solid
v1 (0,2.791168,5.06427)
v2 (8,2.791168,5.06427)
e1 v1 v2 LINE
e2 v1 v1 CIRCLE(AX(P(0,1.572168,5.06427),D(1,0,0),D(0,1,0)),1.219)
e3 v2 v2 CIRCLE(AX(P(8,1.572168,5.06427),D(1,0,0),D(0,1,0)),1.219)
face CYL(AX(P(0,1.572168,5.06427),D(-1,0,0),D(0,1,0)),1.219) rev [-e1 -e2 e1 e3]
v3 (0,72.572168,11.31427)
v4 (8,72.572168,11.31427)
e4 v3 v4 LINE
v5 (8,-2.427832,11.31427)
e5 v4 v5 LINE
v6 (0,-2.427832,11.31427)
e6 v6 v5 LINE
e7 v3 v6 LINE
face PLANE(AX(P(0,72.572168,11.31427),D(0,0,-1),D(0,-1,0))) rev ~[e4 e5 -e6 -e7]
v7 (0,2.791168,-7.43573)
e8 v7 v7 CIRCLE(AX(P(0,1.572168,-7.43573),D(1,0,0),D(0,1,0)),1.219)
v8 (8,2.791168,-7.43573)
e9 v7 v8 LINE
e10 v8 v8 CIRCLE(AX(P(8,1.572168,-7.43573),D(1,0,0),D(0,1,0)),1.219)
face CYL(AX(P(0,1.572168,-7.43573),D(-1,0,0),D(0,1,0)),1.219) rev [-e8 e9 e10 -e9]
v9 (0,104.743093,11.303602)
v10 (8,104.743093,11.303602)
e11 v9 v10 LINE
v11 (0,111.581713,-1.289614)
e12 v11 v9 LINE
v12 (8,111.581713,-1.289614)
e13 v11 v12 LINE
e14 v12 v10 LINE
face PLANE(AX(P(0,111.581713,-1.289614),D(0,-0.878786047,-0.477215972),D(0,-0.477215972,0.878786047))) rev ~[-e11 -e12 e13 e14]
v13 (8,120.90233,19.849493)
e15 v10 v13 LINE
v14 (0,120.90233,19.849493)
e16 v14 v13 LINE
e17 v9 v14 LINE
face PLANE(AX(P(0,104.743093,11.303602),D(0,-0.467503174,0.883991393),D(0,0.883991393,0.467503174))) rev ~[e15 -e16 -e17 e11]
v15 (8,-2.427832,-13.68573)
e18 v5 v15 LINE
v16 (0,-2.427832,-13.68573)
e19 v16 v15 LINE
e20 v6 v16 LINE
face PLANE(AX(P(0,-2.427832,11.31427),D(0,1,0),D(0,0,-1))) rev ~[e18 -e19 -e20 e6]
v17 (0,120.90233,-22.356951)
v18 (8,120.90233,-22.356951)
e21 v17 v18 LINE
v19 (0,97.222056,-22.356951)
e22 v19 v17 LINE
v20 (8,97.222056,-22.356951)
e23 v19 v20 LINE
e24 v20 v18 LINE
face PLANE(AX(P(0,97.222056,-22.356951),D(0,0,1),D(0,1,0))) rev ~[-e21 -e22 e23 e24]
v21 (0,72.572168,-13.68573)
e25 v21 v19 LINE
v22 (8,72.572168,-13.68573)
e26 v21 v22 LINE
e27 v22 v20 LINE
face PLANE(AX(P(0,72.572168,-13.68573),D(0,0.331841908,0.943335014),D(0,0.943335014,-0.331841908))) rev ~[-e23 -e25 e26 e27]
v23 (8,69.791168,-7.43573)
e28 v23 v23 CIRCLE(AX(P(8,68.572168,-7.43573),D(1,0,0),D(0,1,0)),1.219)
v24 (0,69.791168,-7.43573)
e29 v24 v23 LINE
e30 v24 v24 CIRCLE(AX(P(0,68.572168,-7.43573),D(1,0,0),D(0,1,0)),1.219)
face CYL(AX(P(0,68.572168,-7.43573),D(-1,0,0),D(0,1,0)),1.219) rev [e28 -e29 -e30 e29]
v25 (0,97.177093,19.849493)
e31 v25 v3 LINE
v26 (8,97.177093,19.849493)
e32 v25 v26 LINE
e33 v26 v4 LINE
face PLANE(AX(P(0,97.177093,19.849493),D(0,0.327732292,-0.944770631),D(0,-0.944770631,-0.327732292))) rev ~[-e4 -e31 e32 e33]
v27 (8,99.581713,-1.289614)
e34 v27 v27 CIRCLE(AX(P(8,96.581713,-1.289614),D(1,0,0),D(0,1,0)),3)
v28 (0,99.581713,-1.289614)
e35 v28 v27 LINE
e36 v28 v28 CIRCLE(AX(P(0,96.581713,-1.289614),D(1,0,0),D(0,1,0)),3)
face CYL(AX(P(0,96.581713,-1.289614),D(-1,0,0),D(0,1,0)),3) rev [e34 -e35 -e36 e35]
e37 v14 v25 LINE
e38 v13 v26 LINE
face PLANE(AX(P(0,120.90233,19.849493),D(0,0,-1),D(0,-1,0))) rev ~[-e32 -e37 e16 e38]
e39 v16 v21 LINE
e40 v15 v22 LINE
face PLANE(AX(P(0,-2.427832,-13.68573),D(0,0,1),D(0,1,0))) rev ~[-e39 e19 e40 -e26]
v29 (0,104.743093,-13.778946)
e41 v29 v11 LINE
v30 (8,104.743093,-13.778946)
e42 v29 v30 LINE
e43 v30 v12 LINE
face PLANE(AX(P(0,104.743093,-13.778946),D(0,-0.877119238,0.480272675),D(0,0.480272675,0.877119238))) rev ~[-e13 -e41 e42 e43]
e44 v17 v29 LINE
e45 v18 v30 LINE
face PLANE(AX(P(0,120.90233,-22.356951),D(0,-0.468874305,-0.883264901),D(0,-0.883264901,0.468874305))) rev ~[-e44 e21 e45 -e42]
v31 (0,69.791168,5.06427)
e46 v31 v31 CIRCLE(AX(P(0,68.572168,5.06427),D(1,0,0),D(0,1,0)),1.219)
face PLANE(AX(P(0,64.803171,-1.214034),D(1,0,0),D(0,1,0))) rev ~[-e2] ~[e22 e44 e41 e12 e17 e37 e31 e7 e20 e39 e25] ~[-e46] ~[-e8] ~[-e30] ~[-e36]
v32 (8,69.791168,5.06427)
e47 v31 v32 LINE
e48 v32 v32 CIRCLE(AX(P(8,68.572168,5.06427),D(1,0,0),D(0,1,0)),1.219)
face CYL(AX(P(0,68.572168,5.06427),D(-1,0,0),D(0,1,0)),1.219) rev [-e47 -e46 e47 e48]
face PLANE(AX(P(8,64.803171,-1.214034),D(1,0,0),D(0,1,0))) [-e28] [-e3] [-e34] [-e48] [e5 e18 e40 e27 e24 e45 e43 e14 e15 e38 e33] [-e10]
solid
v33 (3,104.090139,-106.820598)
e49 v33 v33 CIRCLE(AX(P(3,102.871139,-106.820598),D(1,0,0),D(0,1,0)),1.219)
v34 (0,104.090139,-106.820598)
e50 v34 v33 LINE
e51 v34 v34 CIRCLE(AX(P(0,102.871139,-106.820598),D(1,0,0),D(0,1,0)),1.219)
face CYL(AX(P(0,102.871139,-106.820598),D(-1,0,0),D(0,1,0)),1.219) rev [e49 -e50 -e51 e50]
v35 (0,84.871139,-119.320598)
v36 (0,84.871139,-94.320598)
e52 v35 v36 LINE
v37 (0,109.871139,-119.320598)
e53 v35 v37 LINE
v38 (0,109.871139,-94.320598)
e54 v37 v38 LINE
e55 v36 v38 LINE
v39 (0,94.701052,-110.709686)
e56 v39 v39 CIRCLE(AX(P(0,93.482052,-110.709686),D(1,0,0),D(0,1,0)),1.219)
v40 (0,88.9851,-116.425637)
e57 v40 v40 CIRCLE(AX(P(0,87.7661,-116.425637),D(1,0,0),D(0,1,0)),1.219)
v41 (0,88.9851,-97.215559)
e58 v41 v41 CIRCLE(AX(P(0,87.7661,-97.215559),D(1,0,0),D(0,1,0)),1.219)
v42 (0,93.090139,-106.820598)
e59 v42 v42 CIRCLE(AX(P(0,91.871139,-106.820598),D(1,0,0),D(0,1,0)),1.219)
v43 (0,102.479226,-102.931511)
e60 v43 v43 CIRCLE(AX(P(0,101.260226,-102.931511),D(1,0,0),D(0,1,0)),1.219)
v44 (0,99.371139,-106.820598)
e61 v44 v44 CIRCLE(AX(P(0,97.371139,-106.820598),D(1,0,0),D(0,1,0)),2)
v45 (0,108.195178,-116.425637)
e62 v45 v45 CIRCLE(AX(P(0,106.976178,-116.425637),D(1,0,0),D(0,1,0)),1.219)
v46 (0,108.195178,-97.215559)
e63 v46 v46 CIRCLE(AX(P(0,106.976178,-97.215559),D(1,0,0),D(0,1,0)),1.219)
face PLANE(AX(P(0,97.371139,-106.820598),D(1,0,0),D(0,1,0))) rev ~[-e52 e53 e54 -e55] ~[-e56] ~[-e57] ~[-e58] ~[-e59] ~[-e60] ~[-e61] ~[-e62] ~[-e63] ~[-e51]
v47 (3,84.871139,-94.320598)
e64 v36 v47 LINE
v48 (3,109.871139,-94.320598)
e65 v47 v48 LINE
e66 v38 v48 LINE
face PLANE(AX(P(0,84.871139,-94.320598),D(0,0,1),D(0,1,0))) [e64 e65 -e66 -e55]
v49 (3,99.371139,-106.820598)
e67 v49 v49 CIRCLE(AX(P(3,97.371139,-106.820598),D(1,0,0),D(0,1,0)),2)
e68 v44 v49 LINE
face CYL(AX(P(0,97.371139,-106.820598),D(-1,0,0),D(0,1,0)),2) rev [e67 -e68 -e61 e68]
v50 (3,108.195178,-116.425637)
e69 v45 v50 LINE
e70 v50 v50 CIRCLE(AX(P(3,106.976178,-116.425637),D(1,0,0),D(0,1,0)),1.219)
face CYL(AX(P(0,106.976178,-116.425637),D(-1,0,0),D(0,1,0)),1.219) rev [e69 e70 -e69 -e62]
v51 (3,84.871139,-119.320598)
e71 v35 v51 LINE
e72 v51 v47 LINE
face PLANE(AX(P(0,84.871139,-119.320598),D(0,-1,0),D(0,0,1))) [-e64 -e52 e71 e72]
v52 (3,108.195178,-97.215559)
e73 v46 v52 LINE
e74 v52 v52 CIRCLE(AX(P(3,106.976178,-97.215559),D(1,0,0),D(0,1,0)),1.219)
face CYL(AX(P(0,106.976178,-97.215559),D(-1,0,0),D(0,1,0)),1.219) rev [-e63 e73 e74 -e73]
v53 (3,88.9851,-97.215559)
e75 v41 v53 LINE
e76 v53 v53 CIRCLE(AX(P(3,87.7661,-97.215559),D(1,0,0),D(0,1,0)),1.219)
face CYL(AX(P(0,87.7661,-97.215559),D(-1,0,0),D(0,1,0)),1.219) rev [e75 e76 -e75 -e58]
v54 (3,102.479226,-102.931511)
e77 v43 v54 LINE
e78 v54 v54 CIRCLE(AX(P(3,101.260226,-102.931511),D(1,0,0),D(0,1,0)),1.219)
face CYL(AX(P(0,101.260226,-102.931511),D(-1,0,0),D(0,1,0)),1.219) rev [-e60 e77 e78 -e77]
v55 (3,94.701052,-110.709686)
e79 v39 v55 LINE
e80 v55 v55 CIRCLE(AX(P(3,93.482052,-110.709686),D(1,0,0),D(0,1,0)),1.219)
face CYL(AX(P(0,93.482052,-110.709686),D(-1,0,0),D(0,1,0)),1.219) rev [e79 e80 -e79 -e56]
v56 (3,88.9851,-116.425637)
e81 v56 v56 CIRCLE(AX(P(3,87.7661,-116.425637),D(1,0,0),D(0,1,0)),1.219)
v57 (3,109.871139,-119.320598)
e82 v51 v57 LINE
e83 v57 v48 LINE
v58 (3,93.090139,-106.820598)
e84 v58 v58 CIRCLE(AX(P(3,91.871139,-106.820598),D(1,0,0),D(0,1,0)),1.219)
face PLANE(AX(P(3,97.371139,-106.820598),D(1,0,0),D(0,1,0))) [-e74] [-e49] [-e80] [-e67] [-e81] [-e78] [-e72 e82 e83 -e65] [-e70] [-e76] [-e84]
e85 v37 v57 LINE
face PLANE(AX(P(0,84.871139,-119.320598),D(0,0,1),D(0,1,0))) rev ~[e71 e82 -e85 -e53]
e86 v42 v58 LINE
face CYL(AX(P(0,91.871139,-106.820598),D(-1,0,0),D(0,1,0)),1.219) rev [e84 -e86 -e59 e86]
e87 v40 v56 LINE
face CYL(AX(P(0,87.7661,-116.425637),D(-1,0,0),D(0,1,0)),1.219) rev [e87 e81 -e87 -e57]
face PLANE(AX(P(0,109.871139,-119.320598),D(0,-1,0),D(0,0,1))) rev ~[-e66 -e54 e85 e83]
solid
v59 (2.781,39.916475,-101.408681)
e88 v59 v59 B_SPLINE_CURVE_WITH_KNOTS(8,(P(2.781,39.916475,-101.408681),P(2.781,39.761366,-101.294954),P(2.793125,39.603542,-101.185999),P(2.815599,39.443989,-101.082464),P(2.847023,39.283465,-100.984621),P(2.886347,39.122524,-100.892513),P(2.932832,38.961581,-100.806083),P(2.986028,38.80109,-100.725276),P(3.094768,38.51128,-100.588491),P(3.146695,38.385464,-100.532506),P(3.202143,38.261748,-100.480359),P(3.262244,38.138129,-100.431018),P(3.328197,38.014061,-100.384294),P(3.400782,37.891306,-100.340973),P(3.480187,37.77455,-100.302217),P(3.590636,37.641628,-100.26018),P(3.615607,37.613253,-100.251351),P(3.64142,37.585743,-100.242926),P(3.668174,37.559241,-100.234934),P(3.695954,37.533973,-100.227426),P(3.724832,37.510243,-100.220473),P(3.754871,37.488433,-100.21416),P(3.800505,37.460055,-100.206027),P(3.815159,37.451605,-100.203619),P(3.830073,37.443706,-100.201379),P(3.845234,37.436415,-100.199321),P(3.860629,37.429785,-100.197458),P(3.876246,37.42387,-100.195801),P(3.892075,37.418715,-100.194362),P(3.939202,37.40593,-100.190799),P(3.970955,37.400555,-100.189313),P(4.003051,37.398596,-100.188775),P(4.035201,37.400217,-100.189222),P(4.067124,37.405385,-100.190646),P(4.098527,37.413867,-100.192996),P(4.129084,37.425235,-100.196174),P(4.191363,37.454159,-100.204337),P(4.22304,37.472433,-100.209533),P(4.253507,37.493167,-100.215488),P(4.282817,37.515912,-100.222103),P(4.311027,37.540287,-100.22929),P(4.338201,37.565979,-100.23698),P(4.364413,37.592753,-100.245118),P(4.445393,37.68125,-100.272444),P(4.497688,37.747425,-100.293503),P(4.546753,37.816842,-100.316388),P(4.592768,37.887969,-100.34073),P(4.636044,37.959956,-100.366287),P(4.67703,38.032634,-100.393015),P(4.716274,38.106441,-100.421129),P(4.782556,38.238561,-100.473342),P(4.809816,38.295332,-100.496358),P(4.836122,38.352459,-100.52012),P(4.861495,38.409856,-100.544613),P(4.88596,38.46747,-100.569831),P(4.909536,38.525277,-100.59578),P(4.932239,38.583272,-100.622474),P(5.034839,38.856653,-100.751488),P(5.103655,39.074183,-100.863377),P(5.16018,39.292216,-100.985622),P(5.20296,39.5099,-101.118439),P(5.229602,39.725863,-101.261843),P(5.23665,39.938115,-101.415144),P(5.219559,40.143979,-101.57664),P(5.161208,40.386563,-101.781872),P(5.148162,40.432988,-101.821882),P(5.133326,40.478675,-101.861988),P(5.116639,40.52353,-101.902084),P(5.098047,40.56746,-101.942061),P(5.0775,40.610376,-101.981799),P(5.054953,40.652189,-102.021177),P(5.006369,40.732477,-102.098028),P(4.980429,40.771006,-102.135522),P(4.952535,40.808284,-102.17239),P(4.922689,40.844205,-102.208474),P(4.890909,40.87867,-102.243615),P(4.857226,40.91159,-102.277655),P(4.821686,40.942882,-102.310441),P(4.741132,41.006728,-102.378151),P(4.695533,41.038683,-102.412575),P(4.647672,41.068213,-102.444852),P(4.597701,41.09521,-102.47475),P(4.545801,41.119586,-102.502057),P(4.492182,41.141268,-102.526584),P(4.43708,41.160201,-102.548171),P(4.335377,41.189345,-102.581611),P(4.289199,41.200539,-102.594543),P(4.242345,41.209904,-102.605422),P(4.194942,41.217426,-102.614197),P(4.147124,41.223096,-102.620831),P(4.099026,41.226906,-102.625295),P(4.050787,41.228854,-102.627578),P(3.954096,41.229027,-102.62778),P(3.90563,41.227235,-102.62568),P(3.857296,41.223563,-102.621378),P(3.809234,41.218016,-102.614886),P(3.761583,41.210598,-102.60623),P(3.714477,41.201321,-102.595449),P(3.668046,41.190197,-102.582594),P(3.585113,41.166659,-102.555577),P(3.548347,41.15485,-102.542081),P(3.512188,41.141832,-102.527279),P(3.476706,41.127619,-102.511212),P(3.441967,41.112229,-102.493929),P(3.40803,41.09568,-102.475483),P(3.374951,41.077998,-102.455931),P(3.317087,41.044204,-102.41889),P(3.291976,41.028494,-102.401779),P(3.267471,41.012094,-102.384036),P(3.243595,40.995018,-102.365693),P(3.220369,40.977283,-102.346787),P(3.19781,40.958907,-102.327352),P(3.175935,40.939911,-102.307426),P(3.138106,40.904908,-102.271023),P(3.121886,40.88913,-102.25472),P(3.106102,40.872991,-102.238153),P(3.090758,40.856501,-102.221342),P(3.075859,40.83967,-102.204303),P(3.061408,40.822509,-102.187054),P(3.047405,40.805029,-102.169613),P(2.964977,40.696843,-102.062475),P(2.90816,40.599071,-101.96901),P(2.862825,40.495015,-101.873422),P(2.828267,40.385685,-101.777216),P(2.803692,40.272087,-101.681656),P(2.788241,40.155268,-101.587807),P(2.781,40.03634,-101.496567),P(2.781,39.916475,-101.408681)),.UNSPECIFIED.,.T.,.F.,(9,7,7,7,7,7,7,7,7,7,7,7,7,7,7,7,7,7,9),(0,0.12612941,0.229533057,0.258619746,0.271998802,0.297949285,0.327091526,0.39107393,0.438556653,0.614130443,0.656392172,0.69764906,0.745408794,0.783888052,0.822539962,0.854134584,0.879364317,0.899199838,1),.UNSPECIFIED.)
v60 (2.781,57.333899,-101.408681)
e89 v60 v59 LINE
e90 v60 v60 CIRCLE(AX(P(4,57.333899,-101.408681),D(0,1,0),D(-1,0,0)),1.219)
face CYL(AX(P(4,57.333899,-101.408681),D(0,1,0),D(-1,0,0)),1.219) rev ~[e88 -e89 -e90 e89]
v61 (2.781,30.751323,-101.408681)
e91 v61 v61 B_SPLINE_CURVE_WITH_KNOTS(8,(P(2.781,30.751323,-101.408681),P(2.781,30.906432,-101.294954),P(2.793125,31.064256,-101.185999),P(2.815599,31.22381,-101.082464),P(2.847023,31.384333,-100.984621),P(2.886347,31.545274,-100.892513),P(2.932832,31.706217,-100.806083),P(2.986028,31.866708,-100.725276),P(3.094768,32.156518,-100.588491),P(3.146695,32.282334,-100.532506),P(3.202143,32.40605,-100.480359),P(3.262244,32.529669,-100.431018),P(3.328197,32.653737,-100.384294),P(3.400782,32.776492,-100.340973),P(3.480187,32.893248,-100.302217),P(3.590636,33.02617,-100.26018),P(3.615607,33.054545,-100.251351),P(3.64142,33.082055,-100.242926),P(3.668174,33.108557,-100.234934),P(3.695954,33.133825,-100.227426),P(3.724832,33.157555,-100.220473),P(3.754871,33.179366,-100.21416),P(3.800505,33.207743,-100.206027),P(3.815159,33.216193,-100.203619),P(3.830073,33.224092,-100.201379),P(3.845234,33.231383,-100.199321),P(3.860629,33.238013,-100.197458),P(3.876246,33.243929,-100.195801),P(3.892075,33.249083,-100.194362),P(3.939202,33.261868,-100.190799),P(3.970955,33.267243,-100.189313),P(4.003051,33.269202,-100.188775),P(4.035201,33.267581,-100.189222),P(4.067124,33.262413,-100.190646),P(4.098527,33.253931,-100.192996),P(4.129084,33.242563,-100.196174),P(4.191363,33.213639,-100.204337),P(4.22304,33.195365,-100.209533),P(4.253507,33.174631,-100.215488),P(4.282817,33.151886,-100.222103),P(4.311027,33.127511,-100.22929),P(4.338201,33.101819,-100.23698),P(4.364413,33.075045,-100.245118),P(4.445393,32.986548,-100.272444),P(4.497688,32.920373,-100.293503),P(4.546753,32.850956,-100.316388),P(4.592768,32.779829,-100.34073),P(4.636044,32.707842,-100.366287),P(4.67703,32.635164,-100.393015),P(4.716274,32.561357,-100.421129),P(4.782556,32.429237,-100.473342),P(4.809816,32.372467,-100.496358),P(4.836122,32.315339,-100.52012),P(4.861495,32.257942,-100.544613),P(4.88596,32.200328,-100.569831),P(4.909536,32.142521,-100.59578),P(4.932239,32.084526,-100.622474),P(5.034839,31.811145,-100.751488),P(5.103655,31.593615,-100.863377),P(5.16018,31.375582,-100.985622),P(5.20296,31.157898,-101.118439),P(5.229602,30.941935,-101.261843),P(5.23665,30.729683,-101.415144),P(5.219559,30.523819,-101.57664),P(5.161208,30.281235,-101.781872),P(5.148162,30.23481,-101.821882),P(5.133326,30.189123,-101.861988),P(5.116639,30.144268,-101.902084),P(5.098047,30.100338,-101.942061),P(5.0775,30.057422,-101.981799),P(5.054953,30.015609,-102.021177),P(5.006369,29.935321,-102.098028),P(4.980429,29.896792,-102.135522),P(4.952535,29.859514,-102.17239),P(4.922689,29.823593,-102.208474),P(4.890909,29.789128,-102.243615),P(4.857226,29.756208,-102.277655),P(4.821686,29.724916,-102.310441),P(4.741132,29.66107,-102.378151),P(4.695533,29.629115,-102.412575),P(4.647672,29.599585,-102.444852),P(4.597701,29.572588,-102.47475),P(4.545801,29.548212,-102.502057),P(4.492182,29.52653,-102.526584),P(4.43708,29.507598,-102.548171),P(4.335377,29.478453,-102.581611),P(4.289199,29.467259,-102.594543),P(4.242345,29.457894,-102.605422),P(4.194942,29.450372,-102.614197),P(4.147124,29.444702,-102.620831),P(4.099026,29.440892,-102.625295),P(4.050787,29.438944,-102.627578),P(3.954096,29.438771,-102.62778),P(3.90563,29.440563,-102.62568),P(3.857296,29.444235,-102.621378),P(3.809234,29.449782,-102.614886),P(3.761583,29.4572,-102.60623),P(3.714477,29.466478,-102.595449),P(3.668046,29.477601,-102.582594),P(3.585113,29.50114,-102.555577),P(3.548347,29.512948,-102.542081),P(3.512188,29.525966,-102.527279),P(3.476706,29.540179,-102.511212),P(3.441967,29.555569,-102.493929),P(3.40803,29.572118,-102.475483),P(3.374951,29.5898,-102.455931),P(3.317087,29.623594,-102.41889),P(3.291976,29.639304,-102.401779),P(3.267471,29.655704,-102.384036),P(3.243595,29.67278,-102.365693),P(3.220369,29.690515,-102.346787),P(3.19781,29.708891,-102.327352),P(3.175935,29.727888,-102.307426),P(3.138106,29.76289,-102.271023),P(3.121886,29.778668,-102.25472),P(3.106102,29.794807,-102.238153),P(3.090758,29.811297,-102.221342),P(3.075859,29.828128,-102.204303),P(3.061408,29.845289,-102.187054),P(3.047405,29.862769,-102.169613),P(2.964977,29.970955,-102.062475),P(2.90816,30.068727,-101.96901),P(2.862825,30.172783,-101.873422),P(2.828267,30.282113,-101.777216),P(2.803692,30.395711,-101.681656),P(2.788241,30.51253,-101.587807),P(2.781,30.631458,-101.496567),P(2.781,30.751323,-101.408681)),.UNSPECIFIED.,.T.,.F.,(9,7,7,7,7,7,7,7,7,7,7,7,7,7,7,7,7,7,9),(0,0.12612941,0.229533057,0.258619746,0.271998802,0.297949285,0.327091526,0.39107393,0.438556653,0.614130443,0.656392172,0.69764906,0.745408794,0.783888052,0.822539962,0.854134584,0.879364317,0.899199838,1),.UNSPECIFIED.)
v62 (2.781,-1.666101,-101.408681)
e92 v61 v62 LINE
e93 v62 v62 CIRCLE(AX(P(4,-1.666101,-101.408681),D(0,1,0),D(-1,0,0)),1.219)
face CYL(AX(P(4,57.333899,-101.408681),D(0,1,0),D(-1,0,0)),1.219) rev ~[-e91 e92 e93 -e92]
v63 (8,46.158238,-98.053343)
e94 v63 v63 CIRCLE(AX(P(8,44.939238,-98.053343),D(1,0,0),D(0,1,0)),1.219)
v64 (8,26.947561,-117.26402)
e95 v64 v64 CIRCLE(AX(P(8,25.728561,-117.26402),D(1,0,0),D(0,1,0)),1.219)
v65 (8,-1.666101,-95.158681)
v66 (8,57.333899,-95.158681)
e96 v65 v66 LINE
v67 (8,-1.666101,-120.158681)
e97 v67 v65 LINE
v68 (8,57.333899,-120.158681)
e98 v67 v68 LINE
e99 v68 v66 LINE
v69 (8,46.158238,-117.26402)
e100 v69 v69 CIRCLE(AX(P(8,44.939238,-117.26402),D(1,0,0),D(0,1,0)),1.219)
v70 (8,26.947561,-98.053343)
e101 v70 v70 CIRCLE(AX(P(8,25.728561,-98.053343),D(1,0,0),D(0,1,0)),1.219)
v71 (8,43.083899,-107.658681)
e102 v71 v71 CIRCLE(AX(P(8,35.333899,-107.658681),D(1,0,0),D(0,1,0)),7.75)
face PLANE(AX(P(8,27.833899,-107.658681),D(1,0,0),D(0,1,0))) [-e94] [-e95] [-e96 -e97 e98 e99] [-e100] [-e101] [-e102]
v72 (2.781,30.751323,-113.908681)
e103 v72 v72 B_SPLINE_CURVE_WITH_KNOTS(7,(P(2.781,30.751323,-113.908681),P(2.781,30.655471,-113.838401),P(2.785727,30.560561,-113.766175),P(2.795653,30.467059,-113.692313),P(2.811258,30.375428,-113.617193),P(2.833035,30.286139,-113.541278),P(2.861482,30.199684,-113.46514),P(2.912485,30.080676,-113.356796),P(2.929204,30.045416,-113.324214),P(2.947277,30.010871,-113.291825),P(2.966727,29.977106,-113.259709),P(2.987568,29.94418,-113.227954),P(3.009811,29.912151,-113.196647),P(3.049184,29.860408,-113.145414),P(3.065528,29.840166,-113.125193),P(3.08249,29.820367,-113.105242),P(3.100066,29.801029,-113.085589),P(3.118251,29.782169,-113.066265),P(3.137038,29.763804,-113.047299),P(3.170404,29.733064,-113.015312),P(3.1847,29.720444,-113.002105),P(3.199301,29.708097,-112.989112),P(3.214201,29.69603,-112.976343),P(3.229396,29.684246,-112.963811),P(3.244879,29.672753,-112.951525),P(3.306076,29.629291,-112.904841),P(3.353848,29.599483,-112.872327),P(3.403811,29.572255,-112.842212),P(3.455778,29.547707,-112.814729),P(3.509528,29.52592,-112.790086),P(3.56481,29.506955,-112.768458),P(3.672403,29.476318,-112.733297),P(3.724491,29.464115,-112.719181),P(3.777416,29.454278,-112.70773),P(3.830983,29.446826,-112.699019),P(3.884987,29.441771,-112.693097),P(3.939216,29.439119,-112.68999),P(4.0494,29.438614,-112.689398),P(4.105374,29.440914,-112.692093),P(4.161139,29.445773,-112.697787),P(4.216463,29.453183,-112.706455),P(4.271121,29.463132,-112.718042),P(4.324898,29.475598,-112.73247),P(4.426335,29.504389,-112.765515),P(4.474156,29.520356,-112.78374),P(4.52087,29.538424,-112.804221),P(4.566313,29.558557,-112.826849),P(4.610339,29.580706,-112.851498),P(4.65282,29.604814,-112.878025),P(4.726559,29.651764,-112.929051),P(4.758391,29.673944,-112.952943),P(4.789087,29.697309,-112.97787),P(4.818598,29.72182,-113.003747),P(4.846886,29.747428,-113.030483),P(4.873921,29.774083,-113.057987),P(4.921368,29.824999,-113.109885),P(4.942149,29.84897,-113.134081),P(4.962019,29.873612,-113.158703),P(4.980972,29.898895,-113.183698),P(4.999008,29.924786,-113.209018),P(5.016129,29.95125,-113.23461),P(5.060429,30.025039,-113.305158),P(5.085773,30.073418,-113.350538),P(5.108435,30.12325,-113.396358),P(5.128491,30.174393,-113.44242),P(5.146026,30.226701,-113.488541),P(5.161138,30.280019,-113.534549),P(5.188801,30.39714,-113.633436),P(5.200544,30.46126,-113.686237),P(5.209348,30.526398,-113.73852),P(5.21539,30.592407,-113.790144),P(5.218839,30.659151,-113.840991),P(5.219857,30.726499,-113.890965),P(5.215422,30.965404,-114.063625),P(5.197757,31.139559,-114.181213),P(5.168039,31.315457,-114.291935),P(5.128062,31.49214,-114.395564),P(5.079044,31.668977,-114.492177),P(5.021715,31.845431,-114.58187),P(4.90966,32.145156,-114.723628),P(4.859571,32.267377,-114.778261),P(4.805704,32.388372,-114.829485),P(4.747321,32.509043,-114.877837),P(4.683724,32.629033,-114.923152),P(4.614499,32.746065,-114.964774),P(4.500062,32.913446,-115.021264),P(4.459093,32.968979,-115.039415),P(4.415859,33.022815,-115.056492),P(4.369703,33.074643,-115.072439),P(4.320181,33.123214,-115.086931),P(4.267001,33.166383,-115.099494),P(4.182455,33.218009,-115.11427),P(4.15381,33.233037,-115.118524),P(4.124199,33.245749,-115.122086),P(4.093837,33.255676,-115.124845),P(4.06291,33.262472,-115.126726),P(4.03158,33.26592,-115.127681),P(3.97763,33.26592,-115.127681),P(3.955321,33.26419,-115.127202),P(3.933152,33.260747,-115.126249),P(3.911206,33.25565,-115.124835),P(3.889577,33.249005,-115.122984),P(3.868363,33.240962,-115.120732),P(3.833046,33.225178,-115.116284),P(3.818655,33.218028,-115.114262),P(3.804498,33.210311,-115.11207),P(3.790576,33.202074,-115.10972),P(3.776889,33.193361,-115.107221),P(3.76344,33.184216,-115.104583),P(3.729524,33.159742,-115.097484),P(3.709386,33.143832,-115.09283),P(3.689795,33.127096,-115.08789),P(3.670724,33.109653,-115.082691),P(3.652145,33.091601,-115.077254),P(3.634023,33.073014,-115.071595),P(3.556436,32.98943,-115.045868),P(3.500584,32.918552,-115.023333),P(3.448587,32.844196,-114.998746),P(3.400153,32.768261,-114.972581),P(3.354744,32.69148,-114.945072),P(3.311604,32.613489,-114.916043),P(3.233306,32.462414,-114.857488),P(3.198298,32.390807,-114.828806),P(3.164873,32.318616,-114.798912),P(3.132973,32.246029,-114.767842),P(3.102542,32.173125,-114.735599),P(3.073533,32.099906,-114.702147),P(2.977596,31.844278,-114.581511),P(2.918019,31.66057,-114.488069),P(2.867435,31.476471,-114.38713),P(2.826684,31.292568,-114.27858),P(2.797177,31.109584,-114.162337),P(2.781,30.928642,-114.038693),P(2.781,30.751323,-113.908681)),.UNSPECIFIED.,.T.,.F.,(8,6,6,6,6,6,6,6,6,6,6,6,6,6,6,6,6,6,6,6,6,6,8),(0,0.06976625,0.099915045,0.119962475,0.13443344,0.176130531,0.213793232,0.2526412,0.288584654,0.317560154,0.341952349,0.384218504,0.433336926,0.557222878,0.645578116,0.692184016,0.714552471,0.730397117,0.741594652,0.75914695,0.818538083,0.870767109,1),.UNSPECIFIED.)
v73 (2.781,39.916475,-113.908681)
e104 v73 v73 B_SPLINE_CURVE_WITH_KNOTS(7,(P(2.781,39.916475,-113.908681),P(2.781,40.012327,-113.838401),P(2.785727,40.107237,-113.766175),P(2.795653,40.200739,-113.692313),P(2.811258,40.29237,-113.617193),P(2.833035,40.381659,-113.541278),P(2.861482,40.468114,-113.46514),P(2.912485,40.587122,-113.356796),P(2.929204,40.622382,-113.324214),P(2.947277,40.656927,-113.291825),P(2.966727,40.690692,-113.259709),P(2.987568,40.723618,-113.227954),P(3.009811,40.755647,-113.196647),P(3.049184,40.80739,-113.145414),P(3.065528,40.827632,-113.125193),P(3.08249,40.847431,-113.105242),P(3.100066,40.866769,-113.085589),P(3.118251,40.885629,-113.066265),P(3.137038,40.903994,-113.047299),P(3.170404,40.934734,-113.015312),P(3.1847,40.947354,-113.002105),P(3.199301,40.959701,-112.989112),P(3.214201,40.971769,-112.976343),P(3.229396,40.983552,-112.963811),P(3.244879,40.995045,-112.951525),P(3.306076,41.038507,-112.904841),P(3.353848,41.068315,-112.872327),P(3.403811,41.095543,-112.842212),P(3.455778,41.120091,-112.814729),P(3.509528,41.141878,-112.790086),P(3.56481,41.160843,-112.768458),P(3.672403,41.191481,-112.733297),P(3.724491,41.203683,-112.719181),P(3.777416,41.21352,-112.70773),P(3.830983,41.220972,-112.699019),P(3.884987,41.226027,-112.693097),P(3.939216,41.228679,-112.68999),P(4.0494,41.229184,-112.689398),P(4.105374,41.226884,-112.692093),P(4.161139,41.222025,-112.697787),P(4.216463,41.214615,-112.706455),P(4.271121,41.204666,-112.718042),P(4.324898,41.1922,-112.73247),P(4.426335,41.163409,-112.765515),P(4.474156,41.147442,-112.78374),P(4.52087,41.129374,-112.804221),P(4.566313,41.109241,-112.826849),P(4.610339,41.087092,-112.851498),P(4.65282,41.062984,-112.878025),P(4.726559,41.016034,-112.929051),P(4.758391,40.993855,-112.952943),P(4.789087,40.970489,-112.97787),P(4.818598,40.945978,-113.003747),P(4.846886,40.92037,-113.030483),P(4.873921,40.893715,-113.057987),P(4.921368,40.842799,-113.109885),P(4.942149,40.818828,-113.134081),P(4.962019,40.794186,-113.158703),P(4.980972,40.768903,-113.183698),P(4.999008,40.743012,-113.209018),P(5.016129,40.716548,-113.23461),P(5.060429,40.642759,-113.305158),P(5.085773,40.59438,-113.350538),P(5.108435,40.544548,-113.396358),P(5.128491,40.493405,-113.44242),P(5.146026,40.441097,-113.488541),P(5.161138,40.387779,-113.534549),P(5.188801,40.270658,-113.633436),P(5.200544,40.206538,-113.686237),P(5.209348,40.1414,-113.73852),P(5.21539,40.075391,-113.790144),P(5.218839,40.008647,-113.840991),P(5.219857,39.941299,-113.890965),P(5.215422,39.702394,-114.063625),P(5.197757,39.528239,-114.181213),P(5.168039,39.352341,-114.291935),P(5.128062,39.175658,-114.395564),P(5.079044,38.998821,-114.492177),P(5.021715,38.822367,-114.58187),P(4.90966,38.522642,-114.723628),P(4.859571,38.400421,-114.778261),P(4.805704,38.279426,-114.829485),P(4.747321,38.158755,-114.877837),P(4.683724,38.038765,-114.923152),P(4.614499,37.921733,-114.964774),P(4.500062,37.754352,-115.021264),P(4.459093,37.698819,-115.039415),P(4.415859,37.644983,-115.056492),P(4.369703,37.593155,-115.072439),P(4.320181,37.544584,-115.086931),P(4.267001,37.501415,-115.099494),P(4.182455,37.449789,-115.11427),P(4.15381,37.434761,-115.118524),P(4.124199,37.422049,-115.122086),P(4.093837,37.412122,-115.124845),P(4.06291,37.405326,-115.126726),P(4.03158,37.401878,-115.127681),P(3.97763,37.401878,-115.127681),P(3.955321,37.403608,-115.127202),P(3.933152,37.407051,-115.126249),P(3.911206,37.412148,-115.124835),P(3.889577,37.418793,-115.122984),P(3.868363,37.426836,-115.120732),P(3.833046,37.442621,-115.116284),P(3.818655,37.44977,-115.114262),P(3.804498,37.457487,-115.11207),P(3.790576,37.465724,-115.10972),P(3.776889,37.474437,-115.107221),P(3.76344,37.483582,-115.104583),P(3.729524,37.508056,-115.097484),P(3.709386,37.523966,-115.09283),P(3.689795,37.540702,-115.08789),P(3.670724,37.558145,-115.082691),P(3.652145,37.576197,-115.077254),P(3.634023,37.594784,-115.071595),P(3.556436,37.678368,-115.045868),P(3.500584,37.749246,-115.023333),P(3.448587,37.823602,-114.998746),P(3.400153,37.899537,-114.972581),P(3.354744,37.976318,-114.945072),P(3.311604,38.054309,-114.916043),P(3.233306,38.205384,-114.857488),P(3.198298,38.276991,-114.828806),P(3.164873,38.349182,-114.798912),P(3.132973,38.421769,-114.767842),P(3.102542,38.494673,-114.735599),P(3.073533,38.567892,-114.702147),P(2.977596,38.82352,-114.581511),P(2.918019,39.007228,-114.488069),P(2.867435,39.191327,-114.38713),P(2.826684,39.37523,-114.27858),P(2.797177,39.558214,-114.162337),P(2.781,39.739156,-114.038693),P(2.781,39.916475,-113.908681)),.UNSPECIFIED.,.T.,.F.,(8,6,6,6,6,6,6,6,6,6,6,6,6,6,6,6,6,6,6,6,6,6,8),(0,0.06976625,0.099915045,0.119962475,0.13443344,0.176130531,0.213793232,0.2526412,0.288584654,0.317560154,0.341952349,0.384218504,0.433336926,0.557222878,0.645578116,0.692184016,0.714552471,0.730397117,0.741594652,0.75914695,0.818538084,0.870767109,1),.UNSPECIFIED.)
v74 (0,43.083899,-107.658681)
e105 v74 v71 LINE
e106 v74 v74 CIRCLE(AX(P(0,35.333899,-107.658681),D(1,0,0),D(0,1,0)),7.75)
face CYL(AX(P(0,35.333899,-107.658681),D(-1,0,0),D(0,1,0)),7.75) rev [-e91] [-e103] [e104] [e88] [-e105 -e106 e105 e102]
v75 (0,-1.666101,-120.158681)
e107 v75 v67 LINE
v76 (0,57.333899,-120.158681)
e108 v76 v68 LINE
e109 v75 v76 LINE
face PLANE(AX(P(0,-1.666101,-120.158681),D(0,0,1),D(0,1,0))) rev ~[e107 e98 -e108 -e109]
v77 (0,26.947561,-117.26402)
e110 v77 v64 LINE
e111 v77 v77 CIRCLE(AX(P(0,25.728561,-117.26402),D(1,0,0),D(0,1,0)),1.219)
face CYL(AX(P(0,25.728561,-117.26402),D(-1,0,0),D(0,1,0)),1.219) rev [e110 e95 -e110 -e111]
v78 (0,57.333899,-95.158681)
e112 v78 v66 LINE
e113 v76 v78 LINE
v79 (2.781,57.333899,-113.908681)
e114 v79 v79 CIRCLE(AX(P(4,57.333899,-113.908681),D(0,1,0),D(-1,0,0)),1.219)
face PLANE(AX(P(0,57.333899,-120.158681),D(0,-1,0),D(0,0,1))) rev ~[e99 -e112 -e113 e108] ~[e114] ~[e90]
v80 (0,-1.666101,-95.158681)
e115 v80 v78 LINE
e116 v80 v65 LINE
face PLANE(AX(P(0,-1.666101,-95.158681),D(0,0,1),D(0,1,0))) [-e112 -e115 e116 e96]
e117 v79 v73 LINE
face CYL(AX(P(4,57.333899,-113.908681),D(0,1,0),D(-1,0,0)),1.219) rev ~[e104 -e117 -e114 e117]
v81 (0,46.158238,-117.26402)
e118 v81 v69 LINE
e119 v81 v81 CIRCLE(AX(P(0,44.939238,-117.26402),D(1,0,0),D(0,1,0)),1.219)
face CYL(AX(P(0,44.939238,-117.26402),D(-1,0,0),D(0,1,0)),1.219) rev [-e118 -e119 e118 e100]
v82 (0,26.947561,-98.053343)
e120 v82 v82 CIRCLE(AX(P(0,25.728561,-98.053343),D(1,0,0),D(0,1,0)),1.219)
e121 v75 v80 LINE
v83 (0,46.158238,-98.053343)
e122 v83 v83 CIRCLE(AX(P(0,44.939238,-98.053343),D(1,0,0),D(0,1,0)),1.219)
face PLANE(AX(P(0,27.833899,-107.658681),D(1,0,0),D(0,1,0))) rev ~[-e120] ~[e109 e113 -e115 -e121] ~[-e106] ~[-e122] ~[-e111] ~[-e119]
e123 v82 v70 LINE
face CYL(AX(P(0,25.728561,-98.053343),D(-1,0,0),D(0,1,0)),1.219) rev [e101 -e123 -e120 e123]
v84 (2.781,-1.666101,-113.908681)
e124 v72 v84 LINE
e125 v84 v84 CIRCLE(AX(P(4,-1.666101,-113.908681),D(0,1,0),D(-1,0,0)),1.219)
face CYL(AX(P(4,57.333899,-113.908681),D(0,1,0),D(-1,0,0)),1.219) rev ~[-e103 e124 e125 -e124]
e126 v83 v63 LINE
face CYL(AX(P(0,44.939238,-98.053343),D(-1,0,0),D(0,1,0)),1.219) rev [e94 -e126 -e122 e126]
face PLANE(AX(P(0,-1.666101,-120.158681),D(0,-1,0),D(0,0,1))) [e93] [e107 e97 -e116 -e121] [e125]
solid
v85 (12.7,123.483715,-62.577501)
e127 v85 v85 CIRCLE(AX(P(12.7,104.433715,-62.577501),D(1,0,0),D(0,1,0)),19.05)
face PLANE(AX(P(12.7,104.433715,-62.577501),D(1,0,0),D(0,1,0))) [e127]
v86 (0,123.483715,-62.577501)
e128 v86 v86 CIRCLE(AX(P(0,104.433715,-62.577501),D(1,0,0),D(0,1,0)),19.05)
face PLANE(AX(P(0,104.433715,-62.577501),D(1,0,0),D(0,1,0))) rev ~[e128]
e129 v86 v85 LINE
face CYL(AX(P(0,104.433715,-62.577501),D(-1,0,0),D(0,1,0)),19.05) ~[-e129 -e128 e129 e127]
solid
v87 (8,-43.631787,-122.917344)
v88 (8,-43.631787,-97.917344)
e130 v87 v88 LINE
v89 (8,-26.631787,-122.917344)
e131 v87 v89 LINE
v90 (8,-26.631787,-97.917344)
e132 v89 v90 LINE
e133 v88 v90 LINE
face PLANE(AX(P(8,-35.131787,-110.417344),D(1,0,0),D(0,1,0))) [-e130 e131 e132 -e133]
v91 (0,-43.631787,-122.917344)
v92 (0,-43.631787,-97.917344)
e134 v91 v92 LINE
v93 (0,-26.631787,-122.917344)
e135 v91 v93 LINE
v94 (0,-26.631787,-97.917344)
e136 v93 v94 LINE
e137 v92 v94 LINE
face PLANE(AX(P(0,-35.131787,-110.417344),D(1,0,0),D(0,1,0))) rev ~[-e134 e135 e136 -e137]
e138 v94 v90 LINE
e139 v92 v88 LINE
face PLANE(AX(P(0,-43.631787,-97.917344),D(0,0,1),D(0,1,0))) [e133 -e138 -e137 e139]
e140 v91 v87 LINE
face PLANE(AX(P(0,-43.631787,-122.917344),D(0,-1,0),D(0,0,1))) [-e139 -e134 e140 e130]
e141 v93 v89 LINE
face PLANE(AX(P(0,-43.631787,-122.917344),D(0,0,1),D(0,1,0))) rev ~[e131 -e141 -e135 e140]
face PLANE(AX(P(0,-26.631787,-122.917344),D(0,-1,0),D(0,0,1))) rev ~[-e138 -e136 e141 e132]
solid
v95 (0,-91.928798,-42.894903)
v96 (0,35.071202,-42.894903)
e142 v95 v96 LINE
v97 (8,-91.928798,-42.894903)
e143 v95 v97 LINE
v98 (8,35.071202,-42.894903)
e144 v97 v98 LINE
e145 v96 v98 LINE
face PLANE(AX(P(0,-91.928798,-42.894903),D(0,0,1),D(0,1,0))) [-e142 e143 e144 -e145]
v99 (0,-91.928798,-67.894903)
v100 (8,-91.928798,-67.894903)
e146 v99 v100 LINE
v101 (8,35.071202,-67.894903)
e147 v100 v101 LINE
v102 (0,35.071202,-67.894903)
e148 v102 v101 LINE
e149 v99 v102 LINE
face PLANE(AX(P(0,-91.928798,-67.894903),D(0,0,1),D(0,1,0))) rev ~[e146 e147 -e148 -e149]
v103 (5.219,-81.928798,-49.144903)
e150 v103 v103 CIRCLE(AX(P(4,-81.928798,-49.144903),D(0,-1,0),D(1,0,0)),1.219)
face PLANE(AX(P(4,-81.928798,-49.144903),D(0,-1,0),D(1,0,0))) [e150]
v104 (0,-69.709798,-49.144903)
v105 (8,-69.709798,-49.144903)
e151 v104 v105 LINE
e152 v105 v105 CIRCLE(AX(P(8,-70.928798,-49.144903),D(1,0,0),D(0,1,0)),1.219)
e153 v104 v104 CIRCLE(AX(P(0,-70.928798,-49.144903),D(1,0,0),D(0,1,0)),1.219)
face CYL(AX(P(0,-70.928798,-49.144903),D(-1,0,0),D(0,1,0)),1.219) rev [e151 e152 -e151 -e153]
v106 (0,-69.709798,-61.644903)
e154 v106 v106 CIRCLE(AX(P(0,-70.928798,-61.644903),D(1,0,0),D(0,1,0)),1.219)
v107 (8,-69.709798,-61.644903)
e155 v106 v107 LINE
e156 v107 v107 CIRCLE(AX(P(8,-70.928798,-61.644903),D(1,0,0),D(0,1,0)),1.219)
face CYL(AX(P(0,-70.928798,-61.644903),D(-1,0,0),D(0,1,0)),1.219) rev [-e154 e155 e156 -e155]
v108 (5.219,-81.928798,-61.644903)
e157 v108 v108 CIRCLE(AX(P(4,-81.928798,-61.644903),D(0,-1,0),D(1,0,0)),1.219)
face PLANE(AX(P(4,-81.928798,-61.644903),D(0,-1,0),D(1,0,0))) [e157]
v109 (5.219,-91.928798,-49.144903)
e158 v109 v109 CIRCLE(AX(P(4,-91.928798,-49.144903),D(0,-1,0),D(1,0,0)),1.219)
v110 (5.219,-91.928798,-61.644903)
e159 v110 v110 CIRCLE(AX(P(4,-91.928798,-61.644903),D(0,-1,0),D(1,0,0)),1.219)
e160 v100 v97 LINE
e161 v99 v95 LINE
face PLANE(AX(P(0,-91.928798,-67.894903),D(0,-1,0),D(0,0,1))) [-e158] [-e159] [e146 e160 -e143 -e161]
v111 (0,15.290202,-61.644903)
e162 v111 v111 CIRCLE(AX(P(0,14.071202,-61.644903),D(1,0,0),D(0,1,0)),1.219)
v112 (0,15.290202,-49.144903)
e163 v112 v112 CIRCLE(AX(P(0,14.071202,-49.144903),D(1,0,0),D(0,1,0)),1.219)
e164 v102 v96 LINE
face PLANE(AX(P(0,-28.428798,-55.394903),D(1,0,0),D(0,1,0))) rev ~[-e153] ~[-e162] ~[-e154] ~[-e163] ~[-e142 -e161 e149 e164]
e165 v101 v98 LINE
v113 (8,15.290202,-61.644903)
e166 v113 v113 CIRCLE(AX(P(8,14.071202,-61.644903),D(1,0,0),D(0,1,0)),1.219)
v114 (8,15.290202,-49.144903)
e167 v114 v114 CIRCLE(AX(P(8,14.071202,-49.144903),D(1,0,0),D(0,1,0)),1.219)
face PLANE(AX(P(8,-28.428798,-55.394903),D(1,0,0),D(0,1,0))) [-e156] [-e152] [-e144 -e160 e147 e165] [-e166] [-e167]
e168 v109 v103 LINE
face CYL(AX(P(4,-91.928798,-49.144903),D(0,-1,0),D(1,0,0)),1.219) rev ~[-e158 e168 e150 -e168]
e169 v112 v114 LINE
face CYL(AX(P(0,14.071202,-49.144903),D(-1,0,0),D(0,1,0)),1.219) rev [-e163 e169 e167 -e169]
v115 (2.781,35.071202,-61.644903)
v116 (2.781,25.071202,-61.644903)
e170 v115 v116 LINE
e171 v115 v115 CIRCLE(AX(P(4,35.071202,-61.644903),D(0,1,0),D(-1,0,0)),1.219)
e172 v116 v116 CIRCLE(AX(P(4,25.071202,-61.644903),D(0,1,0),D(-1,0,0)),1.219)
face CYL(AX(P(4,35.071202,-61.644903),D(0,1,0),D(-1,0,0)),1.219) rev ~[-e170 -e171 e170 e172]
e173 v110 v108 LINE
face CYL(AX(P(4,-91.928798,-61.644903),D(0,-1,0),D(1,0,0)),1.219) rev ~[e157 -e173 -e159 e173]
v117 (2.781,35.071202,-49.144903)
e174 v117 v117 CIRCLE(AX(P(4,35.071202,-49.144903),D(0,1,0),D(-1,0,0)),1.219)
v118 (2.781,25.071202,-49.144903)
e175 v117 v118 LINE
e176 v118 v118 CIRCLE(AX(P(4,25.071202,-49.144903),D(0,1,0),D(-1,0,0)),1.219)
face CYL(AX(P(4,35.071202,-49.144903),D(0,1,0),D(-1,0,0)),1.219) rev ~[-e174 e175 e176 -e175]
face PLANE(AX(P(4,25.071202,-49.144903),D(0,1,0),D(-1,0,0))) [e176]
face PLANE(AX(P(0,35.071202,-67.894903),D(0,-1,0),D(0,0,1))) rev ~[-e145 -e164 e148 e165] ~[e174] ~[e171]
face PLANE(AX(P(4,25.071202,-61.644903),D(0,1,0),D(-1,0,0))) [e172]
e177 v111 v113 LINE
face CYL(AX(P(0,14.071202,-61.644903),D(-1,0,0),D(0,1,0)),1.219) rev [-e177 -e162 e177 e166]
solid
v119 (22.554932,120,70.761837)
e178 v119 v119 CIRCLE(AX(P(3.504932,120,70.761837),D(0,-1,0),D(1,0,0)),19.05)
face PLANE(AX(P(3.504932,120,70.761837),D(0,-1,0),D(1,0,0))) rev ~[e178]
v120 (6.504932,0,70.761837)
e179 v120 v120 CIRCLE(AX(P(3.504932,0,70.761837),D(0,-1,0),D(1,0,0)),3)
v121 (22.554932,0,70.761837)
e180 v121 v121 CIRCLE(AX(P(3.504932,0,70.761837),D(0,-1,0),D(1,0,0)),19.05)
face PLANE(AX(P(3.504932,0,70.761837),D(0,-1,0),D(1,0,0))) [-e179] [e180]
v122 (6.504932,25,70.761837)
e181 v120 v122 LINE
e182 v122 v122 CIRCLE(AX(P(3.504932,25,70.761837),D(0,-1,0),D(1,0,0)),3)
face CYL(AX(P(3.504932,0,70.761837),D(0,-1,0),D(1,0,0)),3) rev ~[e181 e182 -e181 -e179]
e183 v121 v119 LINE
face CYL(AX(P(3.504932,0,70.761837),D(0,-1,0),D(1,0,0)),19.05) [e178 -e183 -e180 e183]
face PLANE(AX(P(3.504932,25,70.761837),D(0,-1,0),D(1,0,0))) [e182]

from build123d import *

# Parameters (mm, degrees)
F0_R      = 1.219
F0_R_2    = 3
F1_DEPTH  = 8
F2_W      = 127
F2_H      = 25
F2_R      = 1.219
F3_DEPTH  = 8
F4_R      = 19.05
F5_DEPTH  = 12.7
F6_W      = 17
F6_H      = 25
F8_DEPTH  = 8
F7_W      = 59
F7_H      = 25
F7_R      = 1.219
F7_R_2    = 7.75
F9_DEPTH  = 8
F10_R     = 19.05
F11_DEPTH = 120
F12_R     = 1.219
F13_DEPTH = 10
F14_R     = 1.219
F15_DEPTH = 10
F16_R     = 1.219
F17_DEPTH = 100
F18_W     = 25
F18_H     = 25
F18_R     = 1.219
F18_R_2   = 2
F19_DEPTH = 3
F20_R     = 3
F21_DEPTH = 25


# Not quite as in the source:
# - a feature names something its author has since deleted; it is built from what else it names


with BuildPart() as f1:
    # F0 (on Right) → F1 (new body)
    with BuildSketch(Plane.YZ):
        Polygon((72.5721682824, 11.3142699003), (-2.4278317176, 11.3142699003), (-2.4278317176, -13.6857300997), (72.5721682824, -13.6857300997), (97.2220564368, -22.3569506155), (120.9023296833, -22.3569506155), (104.7430932522, -13.778945595), (111.5817129612, -1.2896135449), (104.7430932522, 11.3036019504), (120.9023296833, 19.8494932056), (97.1770928144, 19.8494932056), align=None)
        with Locations((1.5721682824, -7.4357300997)):
            Circle(F0_R, mode=Mode.SUBTRACT)
        with Locations((68.5721682824, -7.4357300997)):
            Circle(F0_R, mode=Mode.SUBTRACT)
        with Locations((96.5817129612, -1.2896135449)):
            Circle(F0_R_2, mode=Mode.SUBTRACT)
        with Locations((1.5721682824, 5.0642699003)):
            Circle(F0_R, mode=Mode.SUBTRACT)
        with Locations((68.5721682824, 5.0642699003)):
            Circle(F0_R, mode=Mode.SUBTRACT)
    extrude(amount=F1_DEPTH)


with BuildPart() as f3:
    # F2 (on Right) → F3 (new body)
    with BuildSketch(Plane.YZ):
        with Locations((-28.4287979603, -55.3949028254)):
            Rectangle(F2_W, F2_H)
        with Locations((-70.9287979603, -61.6449028254)):
            Circle(F2_R, mode=Mode.SUBTRACT)
        with Locations((14.0712020397, -61.6449028254)):
            Circle(F2_R, mode=Mode.SUBTRACT)
        with Locations((-70.9287979603, -49.1449028254)):
            Circle(F2_R, mode=Mode.SUBTRACT)
        with Locations((14.0712020397, -49.1449028254)):
            Circle(F2_R, mode=Mode.SUBTRACT)
    extrude(amount=F3_DEPTH)

    # F12 (on face) → F13 (cut)
    with BuildSketch(Plane(origin=(0, 35.0712020397, 0), x_dir=(-1, 0, 0), z_dir=(0, 1, 0))):
        with Locations((-4, -49.1449028254)):
            Circle(F12_R)
        with Locations((-4, -61.6449028254)):
            Circle(F12_R)
    extrude(amount=-F13_DEPTH, mode=Mode.SUBTRACT)

    # F14 (on face) → F15 (cut)
    with BuildSketch(Plane.XZ.offset(91.9287979603)):
        with Locations((4, -49.1449028254)):
            Circle(F14_R)
        with Locations((4, -61.6449028254)):
            Circle(F14_R)
    extrude(amount=-F15_DEPTH, mode=Mode.SUBTRACT)


with BuildPart() as f5:
    # F4 (on Right) → F5 (new body)
    with BuildSketch(Plane.YZ):
        with Locations((104.4337153435, -62.5775009394)):
            Circle(F4_R)
    extrude(amount=F5_DEPTH)


with BuildPart() as f8:
    # F6 (on Right) → F8 (new body)
    with BuildSketch(Plane.YZ):
        with Locations((-35.131787325, -110.4173436761)):
            Rectangle(F6_W, F6_H)
    extrude(amount=F8_DEPTH)


with BuildPart() as f9:
    # F7 (on Right) → F9 (new body)
    with BuildSketch(Plane.YZ):
        with Locations((27.8338990211, -107.6586810813)):
            Rectangle(F7_W, F7_H)
        with Locations((25.7285605055, -117.2640195969)):
            Circle(F7_R, mode=Mode.SUBTRACT)
        with Locations((44.9392375368, -117.2640195969)):
            Circle(F7_R, mode=Mode.SUBTRACT)
        with Locations((35.3338990211, -107.6586810813)):
            Circle(F7_R_2, mode=Mode.SUBTRACT)
        with Locations((25.7285605055, -98.0533425656)):
            Circle(F7_R, mode=Mode.SUBTRACT)
        with Locations((44.9392375368, -98.0533425656)):
            Circle(F7_R, mode=Mode.SUBTRACT)
    extrude(amount=F9_DEPTH)

    # F16 (on face) → F17 (cut)
    with BuildSketch(Plane(origin=(0, 57.3338990211, 0), x_dir=(-1, 0, 0), z_dir=(0, 1, 0))):
        with Locations((-4, -101.4086810813)):
            Circle(F16_R)
        with Locations((-4, -113.9086810813)):
            Circle(F16_R)
    extrude(amount=-F17_DEPTH, mode=Mode.SUBTRACT)


with BuildPart() as f11:
    # F10 (on Front) → F11 (new body)
    with BuildSketch(Plane.XZ):
        with Locations((3.5049319267, 70.7618370652)):
            Circle(F10_R)
    extrude(amount=-F11_DEPTH)

    # F20 (on face) → F21 (cut)
    with BuildSketch(Plane.XZ):
        with Locations((3.5049319267, 70.7618370652)):
            Circle(F20_R)
    extrude(amount=-F21_DEPTH, mode=Mode.SUBTRACT)


with BuildPart() as f19:
    # F18 (on Right) → F19 (new body)
    with BuildSketch(Plane.YZ):
        with Locations((97.371138899, -106.8205982447)):
            Rectangle(F18_W, F18_H)
        with Locations((87.7661001213, -116.4256370224)):
            Circle(F18_R, mode=Mode.SUBTRACT)
        with Locations((93.4820516025, -110.7096855412)):
            Circle(F18_R, mode=Mode.SUBTRACT)
        with Locations((106.9761776768, -116.4256370224)):
            Circle(F18_R, mode=Mode.SUBTRACT)
        with Locations((91.871138899, -106.8205982447)):
            Circle(F18_R, mode=Mode.SUBTRACT)
        with Locations((87.7661001213, -97.2155594669)):
            Circle(F18_R, mode=Mode.SUBTRACT)
        with Locations((97.371138899, -106.8205982447)):
            Circle(F18_R_2, mode=Mode.SUBTRACT)
        with Locations((102.871138899, -106.8205982447)):
            Circle(F18_R, mode=Mode.SUBTRACT)
        with Locations((101.2602261955, -102.9315109481)):
            Circle(F18_R, mode=Mode.SUBTRACT)
        with Locations((106.9761776768, -97.2155594669)):
            Circle(F18_R, mode=Mode.SUBTRACT)
    extrude(amount=F19_DEPTH)


solid = Compound([f1.part, f3.part, f5.part, f8.part, f9.part, f11.part, f19.part])
